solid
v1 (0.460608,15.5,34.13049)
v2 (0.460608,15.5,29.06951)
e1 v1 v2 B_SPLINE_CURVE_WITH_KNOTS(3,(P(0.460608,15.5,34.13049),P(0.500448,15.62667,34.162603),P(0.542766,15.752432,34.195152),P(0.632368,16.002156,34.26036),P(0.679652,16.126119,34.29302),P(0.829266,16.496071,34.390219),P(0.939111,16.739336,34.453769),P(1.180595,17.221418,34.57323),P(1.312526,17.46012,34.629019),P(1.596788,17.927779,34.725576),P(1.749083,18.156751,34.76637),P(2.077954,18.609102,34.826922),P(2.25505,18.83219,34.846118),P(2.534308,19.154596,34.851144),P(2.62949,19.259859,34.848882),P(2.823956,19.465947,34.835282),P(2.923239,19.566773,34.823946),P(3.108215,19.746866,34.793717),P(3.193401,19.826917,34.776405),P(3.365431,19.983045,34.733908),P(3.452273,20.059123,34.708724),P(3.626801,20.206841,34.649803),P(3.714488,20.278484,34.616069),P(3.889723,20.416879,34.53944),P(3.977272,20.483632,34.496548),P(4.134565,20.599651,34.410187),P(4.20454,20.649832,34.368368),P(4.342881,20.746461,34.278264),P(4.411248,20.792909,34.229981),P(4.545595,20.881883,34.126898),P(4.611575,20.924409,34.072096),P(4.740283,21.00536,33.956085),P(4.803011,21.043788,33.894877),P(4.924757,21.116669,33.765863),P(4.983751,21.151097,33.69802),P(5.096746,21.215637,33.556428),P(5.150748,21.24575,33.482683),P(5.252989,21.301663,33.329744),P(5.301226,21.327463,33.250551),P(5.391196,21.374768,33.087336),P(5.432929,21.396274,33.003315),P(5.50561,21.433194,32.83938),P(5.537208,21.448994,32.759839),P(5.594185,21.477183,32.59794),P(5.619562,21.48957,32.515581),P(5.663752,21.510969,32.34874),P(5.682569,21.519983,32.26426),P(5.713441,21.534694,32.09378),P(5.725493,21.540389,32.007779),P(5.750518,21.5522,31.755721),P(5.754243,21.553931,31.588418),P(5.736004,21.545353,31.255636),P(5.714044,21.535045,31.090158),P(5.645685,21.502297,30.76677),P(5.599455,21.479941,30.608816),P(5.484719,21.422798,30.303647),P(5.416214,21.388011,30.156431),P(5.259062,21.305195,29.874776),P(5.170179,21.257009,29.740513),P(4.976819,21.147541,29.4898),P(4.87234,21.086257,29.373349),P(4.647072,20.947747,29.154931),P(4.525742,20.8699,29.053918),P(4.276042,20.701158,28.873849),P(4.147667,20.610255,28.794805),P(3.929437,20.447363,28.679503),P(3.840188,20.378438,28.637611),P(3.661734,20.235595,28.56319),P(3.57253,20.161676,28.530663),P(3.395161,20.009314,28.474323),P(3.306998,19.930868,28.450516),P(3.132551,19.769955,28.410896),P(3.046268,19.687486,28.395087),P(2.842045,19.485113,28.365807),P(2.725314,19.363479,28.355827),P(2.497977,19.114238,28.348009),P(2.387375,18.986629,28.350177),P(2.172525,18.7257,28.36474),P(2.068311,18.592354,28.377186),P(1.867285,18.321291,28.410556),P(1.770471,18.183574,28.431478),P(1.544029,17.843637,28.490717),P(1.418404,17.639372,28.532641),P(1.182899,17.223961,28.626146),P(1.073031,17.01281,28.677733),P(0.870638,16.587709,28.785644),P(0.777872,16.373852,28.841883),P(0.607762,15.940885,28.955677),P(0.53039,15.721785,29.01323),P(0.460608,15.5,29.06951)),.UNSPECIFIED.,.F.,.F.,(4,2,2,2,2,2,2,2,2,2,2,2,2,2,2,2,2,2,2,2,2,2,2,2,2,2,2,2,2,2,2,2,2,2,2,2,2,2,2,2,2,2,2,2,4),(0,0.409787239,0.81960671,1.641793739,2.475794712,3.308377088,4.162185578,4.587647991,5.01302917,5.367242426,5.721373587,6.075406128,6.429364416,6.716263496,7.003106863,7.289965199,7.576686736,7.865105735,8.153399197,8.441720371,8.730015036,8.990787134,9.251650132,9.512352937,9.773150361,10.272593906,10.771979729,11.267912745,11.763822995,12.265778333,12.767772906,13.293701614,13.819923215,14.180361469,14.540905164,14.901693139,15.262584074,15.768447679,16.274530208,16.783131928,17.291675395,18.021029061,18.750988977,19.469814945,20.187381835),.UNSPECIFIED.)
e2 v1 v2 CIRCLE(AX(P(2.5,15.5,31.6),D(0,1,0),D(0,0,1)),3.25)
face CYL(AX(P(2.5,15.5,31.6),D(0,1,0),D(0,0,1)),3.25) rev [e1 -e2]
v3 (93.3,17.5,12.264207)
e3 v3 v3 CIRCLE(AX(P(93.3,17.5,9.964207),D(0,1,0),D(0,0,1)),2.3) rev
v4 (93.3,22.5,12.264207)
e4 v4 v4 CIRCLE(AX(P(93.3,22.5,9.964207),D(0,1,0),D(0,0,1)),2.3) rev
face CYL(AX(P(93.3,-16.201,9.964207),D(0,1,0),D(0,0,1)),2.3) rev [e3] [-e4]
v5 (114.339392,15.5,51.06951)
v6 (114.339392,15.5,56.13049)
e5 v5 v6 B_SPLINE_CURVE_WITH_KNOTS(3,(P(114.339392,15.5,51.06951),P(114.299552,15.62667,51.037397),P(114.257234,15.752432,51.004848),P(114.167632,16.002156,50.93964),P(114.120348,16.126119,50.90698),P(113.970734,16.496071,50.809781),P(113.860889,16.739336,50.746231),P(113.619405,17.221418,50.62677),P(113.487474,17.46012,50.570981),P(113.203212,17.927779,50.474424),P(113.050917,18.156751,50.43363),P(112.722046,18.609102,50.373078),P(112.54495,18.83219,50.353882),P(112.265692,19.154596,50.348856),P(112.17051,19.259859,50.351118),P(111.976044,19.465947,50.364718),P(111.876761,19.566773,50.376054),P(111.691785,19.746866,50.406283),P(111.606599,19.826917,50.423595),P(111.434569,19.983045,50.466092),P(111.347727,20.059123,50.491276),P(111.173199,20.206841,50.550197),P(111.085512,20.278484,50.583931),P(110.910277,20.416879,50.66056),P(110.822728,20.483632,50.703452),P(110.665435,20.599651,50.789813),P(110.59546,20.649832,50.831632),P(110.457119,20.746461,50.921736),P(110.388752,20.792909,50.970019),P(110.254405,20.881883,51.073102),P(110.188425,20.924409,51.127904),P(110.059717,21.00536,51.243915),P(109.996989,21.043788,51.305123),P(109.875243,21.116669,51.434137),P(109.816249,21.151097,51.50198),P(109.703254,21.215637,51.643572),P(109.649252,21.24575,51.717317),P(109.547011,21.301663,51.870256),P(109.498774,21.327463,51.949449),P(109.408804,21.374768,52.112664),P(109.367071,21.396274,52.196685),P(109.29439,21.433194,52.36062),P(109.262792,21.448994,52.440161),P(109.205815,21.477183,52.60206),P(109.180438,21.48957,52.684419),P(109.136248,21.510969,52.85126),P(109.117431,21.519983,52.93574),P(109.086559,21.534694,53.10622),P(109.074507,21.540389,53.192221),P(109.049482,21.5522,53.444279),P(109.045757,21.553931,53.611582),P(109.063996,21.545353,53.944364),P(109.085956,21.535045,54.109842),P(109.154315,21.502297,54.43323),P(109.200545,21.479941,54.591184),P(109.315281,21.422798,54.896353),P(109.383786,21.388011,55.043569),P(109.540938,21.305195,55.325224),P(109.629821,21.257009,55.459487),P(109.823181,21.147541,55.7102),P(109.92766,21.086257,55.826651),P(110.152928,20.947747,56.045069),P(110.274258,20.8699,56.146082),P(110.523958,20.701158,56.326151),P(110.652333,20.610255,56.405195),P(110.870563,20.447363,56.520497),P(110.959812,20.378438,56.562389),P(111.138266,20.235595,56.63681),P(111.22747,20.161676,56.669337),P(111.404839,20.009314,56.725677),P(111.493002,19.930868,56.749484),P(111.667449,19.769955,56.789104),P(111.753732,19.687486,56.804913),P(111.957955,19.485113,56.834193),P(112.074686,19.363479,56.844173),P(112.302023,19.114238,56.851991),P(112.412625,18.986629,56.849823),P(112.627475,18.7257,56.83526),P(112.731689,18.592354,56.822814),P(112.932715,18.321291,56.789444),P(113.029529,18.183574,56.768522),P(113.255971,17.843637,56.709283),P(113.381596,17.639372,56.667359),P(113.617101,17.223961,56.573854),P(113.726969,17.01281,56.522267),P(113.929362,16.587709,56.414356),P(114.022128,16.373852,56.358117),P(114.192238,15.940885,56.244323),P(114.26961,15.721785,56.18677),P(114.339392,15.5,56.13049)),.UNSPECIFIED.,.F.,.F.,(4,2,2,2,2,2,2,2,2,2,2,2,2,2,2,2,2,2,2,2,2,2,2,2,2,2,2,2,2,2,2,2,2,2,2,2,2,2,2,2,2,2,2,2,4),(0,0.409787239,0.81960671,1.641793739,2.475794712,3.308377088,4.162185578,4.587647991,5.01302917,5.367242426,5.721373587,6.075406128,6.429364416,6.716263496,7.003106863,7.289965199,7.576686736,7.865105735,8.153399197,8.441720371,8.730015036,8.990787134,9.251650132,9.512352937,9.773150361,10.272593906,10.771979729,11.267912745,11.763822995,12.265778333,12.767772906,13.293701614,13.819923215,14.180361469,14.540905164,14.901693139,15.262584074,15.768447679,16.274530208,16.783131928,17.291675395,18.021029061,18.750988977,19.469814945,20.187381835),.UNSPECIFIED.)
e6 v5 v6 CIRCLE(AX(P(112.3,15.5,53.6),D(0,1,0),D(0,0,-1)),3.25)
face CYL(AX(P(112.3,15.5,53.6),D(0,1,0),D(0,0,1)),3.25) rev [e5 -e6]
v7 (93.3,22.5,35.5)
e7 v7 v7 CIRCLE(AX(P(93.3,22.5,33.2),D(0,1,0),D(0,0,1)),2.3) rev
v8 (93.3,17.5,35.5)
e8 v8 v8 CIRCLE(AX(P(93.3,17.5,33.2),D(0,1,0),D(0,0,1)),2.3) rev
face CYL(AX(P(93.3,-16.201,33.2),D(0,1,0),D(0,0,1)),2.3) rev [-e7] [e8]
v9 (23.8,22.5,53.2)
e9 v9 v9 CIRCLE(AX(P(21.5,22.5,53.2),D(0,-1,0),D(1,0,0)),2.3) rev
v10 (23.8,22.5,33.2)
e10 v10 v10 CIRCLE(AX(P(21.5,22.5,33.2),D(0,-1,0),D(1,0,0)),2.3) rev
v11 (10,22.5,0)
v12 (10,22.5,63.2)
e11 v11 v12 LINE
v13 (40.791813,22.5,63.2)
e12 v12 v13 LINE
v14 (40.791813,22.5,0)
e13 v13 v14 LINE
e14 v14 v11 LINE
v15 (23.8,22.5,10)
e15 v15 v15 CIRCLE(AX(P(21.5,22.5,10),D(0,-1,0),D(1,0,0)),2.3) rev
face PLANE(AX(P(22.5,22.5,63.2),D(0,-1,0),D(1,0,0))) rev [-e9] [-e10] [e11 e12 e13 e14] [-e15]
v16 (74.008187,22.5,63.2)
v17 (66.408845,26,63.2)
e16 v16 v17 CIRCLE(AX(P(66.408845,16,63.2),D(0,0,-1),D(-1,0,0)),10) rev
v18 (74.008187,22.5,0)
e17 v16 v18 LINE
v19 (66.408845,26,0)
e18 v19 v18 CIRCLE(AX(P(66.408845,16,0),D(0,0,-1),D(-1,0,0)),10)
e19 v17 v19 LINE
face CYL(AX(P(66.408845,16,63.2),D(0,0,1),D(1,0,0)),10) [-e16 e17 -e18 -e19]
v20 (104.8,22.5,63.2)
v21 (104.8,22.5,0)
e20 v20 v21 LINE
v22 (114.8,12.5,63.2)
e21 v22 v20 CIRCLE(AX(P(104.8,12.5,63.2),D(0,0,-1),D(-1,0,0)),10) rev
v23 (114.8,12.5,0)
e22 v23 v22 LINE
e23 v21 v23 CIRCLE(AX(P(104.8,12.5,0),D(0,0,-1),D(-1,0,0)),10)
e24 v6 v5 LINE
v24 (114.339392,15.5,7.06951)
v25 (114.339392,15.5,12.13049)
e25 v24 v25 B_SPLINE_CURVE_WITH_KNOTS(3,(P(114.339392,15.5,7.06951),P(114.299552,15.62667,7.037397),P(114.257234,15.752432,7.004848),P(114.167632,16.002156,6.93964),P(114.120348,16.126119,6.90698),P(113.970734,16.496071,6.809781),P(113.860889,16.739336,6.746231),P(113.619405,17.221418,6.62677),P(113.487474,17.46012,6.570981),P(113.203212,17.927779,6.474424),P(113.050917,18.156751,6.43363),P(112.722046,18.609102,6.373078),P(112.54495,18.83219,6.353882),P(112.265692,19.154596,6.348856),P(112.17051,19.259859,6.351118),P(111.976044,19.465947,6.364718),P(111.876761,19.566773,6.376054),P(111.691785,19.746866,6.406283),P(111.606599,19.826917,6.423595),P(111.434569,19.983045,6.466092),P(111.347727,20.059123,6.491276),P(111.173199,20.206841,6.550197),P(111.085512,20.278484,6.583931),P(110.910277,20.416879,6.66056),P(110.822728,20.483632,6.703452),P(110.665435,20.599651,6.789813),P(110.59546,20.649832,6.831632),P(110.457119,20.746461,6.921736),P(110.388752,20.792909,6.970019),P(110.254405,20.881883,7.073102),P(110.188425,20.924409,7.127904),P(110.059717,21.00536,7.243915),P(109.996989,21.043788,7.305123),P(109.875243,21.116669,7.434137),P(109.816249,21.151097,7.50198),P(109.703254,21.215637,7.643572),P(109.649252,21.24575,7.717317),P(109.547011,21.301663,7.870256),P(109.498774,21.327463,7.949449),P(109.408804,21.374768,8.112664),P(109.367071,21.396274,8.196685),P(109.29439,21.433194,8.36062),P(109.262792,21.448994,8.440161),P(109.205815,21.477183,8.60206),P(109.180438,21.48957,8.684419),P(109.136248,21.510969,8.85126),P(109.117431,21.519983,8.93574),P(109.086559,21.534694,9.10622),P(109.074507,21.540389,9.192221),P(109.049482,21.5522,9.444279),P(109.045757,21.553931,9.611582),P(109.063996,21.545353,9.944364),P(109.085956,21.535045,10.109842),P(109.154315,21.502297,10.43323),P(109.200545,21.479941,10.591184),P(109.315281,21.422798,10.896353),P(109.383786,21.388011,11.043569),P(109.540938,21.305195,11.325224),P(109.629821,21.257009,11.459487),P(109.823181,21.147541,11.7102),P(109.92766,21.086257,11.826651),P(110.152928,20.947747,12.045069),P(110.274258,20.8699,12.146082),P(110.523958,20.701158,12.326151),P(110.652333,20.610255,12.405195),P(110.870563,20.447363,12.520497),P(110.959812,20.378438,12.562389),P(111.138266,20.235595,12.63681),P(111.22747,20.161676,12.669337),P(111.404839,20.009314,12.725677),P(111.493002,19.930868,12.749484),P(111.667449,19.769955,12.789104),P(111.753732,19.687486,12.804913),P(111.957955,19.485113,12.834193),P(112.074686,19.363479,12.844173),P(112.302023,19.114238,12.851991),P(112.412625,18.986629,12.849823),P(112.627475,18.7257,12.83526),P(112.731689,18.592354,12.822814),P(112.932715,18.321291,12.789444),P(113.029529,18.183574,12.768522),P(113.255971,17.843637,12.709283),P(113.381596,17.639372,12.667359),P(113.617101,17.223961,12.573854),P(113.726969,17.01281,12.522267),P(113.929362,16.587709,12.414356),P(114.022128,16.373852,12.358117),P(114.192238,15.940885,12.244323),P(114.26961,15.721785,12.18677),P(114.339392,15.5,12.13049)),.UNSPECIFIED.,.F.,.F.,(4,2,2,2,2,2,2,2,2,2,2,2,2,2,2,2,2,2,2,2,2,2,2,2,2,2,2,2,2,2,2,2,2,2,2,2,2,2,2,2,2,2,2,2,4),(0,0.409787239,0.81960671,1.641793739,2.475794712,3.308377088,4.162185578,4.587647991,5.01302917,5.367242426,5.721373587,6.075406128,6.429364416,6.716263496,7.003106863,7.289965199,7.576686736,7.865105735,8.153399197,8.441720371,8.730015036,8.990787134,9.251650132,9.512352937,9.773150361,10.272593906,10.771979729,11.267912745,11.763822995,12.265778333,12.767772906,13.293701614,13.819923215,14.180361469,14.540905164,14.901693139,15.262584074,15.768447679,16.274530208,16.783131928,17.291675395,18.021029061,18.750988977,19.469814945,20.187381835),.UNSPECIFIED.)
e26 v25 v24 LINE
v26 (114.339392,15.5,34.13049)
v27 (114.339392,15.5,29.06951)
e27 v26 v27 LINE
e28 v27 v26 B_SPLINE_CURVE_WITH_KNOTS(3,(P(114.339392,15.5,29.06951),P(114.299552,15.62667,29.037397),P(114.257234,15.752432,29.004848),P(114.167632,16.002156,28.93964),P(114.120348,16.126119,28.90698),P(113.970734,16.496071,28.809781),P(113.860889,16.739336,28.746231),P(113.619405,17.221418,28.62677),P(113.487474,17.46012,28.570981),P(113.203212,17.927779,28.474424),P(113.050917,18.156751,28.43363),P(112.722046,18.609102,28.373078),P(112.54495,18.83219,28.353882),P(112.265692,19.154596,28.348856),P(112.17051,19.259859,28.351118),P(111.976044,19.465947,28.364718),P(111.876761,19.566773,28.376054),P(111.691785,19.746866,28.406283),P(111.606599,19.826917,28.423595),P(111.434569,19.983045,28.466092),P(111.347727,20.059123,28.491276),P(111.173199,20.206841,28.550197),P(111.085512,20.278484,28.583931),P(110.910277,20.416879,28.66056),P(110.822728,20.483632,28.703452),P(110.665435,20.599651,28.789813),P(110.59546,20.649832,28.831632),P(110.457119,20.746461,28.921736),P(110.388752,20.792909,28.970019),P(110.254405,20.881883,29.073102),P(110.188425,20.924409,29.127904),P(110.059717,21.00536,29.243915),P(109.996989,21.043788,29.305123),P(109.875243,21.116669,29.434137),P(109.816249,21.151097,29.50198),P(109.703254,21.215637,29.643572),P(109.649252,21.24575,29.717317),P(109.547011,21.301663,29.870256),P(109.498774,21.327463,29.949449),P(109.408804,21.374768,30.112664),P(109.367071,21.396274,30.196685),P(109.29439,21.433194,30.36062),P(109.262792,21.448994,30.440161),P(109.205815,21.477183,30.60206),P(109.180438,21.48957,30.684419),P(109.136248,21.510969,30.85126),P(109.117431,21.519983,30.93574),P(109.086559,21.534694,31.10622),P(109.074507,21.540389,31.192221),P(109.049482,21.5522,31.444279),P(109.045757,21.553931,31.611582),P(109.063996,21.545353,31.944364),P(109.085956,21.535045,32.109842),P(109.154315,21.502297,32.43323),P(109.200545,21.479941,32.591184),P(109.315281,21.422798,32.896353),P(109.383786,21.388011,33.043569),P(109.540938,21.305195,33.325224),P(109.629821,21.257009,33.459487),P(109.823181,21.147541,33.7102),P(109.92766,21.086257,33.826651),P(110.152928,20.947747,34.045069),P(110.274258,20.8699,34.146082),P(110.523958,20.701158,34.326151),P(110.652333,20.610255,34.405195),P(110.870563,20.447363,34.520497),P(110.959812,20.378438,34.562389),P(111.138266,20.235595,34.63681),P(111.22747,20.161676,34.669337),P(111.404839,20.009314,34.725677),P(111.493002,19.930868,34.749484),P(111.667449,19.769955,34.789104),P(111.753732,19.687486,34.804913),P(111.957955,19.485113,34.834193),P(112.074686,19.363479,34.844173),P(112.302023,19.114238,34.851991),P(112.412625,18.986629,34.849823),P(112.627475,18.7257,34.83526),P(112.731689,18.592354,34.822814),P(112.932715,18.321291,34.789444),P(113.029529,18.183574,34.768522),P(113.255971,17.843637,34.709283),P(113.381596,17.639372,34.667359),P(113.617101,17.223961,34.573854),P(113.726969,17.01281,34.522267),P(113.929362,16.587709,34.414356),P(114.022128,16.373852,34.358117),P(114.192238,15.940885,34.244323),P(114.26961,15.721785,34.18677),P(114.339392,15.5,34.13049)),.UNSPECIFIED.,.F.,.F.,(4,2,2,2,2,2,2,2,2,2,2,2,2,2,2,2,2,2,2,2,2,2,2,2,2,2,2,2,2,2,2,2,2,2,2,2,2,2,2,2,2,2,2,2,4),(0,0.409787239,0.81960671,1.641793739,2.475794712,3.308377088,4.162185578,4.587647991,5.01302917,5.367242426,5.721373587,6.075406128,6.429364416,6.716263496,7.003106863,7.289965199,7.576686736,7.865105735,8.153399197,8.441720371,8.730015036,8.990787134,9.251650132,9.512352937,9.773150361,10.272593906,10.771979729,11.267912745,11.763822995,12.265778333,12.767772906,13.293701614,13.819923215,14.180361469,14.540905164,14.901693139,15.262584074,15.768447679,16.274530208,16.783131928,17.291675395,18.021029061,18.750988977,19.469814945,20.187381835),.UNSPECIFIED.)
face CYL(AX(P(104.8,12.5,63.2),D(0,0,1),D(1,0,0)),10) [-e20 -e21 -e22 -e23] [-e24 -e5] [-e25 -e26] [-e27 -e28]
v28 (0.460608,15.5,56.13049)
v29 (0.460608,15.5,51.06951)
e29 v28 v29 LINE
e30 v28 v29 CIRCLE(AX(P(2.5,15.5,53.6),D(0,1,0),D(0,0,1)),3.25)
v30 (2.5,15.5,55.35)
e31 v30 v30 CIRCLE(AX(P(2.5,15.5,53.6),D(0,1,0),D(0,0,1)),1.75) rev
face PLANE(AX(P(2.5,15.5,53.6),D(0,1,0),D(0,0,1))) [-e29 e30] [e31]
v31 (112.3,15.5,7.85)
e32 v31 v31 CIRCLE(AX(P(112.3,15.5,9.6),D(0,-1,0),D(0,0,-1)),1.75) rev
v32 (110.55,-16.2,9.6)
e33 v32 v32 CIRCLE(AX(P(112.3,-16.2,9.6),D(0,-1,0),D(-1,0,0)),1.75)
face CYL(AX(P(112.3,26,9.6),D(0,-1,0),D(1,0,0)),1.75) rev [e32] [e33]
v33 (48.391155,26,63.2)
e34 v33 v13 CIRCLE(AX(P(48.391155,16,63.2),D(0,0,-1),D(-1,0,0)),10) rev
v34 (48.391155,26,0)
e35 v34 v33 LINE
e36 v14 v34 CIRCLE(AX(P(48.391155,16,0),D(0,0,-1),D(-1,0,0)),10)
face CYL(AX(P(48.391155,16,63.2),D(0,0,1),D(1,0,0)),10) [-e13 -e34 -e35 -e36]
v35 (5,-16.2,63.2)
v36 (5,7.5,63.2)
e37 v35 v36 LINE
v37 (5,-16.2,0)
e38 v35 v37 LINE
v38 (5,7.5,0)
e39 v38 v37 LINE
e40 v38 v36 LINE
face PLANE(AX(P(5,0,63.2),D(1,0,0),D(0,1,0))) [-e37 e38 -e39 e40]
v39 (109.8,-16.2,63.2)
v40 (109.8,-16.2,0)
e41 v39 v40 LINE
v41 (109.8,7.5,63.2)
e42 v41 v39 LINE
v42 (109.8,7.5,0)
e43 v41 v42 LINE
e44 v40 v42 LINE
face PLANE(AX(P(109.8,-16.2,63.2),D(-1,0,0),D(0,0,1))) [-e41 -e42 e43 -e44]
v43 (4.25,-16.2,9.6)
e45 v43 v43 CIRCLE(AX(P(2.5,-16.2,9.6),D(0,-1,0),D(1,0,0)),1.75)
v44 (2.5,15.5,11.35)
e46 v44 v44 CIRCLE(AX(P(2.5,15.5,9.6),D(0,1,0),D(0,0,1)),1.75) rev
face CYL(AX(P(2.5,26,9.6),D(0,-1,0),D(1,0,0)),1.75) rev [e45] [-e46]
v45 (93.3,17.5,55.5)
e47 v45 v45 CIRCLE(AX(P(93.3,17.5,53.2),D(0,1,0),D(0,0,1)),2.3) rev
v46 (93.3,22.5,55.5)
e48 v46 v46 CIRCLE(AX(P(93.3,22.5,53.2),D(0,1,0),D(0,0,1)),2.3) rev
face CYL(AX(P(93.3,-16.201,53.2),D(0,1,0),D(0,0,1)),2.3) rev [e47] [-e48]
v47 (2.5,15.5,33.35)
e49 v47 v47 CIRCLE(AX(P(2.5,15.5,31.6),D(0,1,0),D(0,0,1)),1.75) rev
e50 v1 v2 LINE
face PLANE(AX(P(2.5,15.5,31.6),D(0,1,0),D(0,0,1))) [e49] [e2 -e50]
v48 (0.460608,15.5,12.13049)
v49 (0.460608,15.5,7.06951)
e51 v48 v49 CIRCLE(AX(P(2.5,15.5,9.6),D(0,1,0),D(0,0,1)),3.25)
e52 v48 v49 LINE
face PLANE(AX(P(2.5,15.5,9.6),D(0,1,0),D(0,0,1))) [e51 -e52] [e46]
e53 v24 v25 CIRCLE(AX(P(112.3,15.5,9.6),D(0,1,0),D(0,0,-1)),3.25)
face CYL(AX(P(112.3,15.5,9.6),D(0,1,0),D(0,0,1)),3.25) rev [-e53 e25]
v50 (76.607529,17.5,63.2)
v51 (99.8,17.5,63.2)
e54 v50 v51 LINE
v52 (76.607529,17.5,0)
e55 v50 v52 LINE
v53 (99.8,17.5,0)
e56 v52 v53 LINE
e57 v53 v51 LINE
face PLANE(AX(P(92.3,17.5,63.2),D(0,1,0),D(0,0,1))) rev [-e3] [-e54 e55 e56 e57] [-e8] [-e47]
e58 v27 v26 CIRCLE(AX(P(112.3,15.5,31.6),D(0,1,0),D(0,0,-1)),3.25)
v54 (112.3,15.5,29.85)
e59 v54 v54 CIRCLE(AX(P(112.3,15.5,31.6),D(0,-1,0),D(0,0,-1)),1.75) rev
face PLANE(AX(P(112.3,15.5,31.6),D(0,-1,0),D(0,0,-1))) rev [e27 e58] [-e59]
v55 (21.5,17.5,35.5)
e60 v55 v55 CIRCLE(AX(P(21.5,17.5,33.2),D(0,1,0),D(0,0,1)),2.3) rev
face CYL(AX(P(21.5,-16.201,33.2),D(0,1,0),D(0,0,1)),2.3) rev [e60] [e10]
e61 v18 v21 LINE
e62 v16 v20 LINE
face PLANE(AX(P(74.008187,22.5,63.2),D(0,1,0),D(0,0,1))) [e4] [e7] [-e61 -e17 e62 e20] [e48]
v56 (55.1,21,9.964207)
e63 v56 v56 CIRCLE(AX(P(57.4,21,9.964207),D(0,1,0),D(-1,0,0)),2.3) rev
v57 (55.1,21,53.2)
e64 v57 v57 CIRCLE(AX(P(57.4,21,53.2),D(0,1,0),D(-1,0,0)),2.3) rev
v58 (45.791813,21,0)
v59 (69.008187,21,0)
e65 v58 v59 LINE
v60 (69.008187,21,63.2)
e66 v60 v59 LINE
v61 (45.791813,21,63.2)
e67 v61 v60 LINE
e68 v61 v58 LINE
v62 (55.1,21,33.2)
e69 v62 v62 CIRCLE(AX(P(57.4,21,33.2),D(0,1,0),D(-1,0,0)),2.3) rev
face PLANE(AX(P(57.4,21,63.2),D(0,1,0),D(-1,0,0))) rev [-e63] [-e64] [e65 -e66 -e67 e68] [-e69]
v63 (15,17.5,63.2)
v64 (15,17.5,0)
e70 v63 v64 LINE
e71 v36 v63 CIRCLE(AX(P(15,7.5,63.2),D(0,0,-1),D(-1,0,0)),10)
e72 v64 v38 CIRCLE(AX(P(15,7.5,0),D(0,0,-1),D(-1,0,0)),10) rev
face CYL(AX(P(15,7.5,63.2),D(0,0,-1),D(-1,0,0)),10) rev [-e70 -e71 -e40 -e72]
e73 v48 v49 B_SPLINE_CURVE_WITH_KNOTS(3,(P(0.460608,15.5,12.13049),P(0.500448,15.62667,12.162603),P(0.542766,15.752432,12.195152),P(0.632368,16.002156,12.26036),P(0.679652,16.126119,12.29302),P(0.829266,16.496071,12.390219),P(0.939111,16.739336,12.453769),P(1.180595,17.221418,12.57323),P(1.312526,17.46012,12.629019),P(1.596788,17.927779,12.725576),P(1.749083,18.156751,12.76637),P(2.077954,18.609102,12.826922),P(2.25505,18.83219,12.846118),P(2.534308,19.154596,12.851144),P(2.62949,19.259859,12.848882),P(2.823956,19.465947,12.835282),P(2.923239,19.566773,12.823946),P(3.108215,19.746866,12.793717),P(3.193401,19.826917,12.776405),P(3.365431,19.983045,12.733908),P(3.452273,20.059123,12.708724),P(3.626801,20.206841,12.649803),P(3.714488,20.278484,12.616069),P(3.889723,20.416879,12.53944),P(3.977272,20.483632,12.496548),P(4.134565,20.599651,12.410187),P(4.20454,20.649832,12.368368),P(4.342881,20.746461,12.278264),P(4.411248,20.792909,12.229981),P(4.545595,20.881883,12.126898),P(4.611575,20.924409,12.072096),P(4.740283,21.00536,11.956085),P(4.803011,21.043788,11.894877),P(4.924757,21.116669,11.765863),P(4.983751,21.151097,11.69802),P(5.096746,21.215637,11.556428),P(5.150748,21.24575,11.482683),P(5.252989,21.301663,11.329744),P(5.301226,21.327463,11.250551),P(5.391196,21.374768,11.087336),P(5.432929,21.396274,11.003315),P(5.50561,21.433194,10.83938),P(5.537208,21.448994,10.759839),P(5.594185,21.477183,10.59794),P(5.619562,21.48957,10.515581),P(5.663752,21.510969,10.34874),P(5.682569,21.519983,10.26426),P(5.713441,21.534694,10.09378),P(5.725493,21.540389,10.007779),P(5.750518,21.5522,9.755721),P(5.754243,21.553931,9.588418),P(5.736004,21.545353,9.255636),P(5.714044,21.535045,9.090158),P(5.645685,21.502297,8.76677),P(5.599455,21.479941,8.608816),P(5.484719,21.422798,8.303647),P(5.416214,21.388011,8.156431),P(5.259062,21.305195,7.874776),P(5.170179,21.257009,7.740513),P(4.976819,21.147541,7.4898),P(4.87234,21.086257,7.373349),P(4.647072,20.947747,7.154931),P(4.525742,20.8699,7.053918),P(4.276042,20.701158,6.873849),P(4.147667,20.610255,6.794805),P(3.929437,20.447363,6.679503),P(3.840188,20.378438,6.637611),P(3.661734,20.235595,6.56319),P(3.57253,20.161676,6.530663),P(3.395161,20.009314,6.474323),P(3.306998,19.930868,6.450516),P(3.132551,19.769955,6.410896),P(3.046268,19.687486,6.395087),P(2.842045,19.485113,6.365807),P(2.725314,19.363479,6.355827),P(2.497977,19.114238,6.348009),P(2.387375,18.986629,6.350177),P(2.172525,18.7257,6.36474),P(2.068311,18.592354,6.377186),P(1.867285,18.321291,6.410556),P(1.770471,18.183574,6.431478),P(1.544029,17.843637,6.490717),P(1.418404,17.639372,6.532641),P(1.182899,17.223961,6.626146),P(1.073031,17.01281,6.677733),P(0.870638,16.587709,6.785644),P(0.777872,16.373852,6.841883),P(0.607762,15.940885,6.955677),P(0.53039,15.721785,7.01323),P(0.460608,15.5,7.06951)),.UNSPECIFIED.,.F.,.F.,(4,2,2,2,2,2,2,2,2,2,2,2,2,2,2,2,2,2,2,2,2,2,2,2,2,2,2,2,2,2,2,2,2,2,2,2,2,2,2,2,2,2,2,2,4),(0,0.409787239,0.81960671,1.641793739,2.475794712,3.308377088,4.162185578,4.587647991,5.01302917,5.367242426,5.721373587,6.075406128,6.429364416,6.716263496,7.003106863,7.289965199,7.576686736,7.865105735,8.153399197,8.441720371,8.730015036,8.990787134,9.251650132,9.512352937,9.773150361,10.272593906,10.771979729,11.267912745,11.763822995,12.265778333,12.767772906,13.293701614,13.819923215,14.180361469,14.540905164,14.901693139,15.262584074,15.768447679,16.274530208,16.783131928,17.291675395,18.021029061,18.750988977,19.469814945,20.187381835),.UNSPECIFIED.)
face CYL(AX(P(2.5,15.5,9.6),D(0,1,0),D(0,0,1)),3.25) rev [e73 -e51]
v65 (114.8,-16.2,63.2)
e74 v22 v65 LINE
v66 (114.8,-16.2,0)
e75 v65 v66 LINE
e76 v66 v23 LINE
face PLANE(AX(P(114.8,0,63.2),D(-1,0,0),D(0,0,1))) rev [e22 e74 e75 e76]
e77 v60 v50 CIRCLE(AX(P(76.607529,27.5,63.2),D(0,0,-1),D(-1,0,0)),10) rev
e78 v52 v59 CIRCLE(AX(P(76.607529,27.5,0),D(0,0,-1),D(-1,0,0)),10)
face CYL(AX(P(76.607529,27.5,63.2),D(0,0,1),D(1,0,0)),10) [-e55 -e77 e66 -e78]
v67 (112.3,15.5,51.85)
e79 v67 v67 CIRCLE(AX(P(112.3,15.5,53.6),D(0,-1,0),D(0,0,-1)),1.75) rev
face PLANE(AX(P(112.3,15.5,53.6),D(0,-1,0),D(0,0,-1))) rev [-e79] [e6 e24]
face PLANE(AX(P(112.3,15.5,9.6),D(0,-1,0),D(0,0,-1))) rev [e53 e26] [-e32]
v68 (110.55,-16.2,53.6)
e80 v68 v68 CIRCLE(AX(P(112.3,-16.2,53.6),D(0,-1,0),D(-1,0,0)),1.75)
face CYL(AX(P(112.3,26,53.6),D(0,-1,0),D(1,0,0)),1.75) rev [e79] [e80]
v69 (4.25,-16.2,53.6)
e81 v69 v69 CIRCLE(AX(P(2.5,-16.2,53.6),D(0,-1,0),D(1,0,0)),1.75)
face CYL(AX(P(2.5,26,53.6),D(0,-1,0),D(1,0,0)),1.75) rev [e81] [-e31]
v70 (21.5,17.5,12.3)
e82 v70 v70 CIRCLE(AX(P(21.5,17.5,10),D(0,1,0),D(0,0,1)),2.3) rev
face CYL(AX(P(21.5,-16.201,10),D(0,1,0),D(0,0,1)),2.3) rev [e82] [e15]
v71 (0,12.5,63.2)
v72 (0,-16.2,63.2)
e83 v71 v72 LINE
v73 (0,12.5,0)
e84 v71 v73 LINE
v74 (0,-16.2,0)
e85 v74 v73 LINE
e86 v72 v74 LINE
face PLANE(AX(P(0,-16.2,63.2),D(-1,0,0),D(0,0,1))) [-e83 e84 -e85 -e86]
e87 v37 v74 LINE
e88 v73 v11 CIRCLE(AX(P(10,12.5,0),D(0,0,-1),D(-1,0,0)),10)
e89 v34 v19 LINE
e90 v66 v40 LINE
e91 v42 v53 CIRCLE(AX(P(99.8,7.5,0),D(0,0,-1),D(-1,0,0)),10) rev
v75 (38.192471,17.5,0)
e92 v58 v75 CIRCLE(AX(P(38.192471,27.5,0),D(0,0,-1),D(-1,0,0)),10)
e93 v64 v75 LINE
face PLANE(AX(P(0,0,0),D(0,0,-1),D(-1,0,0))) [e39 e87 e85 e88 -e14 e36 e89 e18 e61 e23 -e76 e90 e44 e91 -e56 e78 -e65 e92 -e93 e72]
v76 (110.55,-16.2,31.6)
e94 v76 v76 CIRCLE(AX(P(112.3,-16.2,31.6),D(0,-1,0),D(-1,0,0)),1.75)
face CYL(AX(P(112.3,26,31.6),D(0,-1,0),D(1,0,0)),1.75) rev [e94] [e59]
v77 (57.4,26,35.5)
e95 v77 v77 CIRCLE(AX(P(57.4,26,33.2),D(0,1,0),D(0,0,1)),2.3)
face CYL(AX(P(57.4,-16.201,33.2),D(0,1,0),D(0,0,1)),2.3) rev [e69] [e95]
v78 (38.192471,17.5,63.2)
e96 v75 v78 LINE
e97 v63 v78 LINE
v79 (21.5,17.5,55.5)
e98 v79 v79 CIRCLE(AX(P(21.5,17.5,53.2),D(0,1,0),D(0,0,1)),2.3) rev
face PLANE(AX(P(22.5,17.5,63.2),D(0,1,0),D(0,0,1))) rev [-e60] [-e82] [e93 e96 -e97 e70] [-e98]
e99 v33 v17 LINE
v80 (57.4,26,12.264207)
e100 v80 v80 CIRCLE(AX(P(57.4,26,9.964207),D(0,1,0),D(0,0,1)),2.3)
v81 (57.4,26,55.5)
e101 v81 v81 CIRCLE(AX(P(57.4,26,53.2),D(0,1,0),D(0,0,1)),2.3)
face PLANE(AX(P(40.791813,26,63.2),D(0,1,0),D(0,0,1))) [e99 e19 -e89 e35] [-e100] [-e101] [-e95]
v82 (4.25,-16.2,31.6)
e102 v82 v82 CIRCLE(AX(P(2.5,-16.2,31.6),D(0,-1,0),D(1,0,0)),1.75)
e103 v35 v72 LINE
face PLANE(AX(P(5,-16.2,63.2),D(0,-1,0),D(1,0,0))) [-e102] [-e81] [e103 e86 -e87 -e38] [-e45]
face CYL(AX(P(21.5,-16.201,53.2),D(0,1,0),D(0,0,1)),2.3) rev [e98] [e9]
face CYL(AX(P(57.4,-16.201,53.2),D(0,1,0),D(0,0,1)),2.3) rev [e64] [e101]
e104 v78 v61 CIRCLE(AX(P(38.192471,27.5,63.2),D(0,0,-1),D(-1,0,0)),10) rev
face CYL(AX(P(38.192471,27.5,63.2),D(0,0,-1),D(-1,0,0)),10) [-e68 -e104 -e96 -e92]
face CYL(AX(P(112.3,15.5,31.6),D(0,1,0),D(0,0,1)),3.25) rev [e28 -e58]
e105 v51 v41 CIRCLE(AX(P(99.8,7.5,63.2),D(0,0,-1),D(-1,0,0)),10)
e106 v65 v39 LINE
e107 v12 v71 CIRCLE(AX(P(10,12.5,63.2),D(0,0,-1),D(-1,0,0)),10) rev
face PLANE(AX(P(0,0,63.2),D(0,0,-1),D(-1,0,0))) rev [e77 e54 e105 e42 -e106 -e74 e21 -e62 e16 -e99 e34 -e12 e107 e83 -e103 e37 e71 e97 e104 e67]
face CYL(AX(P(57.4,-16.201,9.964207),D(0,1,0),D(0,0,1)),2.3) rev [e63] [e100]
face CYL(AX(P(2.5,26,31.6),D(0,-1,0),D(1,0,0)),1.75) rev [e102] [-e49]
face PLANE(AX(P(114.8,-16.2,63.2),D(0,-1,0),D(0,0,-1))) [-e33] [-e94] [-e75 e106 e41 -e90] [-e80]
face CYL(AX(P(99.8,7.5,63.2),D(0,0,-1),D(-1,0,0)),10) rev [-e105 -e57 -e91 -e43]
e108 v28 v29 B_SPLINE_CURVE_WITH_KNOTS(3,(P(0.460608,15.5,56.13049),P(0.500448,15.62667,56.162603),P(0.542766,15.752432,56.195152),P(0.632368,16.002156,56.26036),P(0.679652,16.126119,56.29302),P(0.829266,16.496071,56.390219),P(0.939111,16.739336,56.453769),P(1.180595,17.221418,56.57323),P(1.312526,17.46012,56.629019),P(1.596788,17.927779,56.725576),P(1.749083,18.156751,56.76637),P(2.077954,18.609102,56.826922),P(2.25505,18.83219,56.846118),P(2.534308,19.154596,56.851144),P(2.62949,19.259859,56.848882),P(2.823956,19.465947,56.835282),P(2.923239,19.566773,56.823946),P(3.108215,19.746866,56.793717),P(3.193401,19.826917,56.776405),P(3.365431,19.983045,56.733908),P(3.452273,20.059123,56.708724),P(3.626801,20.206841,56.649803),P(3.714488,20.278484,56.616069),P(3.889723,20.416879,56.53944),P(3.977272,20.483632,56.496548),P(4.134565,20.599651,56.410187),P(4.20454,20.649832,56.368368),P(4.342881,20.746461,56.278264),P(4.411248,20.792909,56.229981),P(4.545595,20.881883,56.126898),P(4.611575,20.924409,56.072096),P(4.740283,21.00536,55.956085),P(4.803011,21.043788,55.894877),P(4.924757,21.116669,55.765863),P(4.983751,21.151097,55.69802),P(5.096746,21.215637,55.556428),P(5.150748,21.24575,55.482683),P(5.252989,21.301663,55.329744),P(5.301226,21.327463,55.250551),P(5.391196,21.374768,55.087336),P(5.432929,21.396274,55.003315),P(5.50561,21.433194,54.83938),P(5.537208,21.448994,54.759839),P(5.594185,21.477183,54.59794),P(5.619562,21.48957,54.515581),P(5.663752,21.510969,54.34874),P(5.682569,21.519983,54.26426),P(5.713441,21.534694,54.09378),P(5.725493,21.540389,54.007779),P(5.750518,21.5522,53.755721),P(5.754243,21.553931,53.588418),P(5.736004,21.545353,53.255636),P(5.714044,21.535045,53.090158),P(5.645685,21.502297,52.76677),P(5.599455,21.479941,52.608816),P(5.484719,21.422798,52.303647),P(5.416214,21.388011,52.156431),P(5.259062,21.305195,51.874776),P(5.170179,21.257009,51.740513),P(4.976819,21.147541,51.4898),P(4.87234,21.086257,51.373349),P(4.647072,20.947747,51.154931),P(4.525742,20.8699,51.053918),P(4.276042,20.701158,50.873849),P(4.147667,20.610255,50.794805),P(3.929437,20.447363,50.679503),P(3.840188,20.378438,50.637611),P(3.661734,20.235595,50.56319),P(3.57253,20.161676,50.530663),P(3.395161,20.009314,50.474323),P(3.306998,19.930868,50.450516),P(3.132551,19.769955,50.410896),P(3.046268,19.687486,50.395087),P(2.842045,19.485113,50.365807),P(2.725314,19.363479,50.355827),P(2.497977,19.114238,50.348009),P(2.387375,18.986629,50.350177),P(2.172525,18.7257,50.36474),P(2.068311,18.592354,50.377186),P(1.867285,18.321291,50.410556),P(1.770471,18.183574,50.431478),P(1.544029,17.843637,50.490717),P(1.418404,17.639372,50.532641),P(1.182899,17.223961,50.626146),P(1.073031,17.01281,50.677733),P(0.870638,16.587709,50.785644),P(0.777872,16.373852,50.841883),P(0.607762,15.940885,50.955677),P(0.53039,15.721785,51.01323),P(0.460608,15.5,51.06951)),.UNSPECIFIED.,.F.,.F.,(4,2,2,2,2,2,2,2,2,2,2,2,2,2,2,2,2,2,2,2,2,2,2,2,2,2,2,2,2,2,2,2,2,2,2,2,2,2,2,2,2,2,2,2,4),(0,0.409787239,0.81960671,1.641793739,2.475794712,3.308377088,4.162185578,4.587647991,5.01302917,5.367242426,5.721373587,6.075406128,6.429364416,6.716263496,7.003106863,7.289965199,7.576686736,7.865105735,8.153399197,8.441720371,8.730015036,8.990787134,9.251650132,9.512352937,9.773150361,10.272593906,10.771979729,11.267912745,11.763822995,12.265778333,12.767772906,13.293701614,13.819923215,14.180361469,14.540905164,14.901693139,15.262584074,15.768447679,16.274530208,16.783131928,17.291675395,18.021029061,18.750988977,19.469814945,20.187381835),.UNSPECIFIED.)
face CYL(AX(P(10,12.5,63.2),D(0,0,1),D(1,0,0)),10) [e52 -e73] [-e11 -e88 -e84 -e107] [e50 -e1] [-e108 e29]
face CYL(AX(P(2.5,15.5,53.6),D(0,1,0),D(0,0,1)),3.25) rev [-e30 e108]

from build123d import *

# Parameters (mm, degrees)
BOSS_EXTRUDE1_DEPTH = 63.2
FILLET1_R           = 10
FILLET2_R           = 10
FILLET3_R           = 10
CUT_EXTRUDE1_REACH  = 139.674
SKETCH2_R           = 2.3
SKETCH3_R           = 1.75
CUT_EXTRUDE2_DEPTH  = 138.67396268
SKETCH4_R           = 3.25
CUT_EXTRUDE3_DEPTH  = 7


with BuildPart() as part:
    # Sketch1 → Boss-Extrude1 (new body)
    with BuildSketch(Plane.XY):
        Polygon((114.8, 0), (114.8, 22.5), (92.3, 22.5), (74.008186766, 22.5), (74.008186766, 26), (40.791813234, 26), (40.791813234, 22.5), (22.5, 22.5), (0, 22.5), (0, 0), (0, -16.2), (5, -16.2), (5, 0), (5, 17.5), (22.5, 17.5), (45.791813234, 17.5), (45.791813234, 21), (57.4, 21), (69.008186766, 21), (69.008186766, 17.5), (92.3, 17.5), (109.8, 17.5), (109.8, 0), (109.8, -16.2), (114.8, -16.2), align=None)
    extrude(amount=BOSS_EXTRUDE1_DEPTH)

    # Fillet1
    fillet1_edges = [part.edges().sort_by_distance(p)[0] for p in [
        (0, 22.5, 31.6),
        (114.8, 22.5, 31.6),
        (109.8, 17.5, 31.6),
        (5, 17.5, 31.6),
    ]]
    fillet(fillet1_edges, radius=FILLET1_R)

    # Fillet2
    # the kernel refuses this fillet: 10 mm, written as the material it takes off along each edge
    with BuildSketch(Plane(origin=(40.791813234, 26, -18.998355192), x_dir=(1, 0, 0), z_dir=(0, 0, 1))) as fillet2_piece_1:
        with BuildLine():
            CenterArc((7.599342077, -10), FILLET2_R, 90, 49.458398126)
            Line((0, -3.5), (-0.151986842, -3.37))
            ThreePointArc((-0.151986842, -3.37), (-0.2, -1.75), (-0.2, 0))
            Line((-0.2, 0), (0, 0.2))
            Line((0, 0.2), (7.599342077, 0.2))
            Line((7.599342077, 0.2), (7.599342077, 0))
        make_face()
    extrude(amount=101.196710384, mode=Mode.SUBTRACT)
    with BuildSketch(Plane(origin=(74.008186766, 26, -18.998355192), x_dir=(0, -1, 0), z_dir=(0, 0, 1))) as fillet2_piece_2:
        with BuildLine():
            CenterArc((10, -7.599342077), FILLET2_R, 130.541601874, 49.458398126)
            Line((0, -7.599342077), (-0.2, -7.599342077))
            Line((-0.2, -7.599342077), (-0.2, 0))
            Line((-0.2, 0), (0, 0.2))
            ThreePointArc((0, 0.2), (1.75, 0.2), (3.37, 0.151986842))
            Line((3.37, 0.151986842), (3.5, 0))
        make_face()
    extrude(amount=101.196710384, mode=Mode.SUBTRACT)

    # Fillet3
    # the kernel refuses this fillet: 10 mm, written as the material it takes off along each edge
    with BuildSketch(Plane(origin=(45.791813234, 17.5, -18.998355192), x_dir=(0, 1, 0), z_dir=(0, 0, 1))) as fillet3_piece_1:
        with BuildLine():
            CenterArc((10, 7.599342077), FILLET3_R, 180, 49.458398126)
            Line((0, 7.599342077), (-0.2, 7.599342077))
            Line((-0.2, 7.599342077), (-0.2, 0))
            Line((-0.2, 0), (0, -0.2))
            ThreePointArc((0, -0.2), (1.75, -0.2), (3.37, -0.151986842))
            Line((3.37, -0.151986842), (3.5, 0))
        make_face()
    extrude(amount=101.196710384, mode=Mode.SUBTRACT)
    with BuildSketch(Plane(origin=(69.008186766, 17.5, -18.998355192), x_dir=(1, 0, 0), z_dir=(0, 0, 1))) as fillet3_piece_2:
        with BuildLine():
            CenterArc((7.599342077, 10), FILLET3_R, 220.541601874, 49.458398126)
            Line((0, 3.5), (-0.151986842, 3.37))
            ThreePointArc((-0.151986842, 3.37), (-0.2, 1.75), (-0.2, 0))
            Line((-0.2, 0), (0, -0.2))
            Line((0, -0.2), (7.599342077, -0.2))
            Line((7.599342077, -0.2), (7.599342077, 0))
        make_face()
    extrude(amount=101.196710384, mode=Mode.SUBTRACT)

    # Sketch2 → Cut-Extrude1 (cut, up to next)
    with BuildSketch(Plane(origin=(0, 26, 0), x_dir=(1, 0, 0), z_dir=(0, 1, 0)), mode=Mode.PRIVATE) as cut_extrude1_sk1:
        with Locations(Location((57.4, -9.964206912, 0), (0, 0, 270))):
            Circle(SKETCH2_R)
    cut_extrude1_tool1 = extrude(cut_extrude1_sk1.sketch, amount=-CUT_EXTRUDE1_REACH, mode=Mode.PRIVATE) & part.part
    # Sketch2 → Cut-Extrude1 (cut, up to next)
    with BuildSketch(Plane(origin=(0, 26, 0), x_dir=(1, 0, 0), z_dir=(0, 1, 0)), mode=Mode.PRIVATE) as cut_extrude1_sk2:
        with Locations(Location((57.4, -33.2, 0), (0, 0, 270))):
            Circle(SKETCH2_R)
    cut_extrude1_tool2 = extrude(cut_extrude1_sk2.sketch, amount=-CUT_EXTRUDE1_REACH, mode=Mode.PRIVATE) & part.part
    # Sketch2 → Cut-Extrude1 (cut, up to next)
    with BuildSketch(Plane(origin=(0, 26, 0), x_dir=(1, 0, 0), z_dir=(0, 1, 0)), mode=Mode.PRIVATE) as cut_extrude1_sk3:
        with Locations(Location((57.4, -53.2, 0), (0, 0, 270))):
            Circle(SKETCH2_R)
    cut_extrude1_tool3 = extrude(cut_extrude1_sk3.sketch, amount=-CUT_EXTRUDE1_REACH, mode=Mode.PRIVATE) & part.part
    # Sketch2 → Cut-Extrude1 (cut, up to next)
    with BuildSketch(Plane(origin=(0, 26, 0), x_dir=(1, 0, 0), z_dir=(0, 1, 0)), mode=Mode.PRIVATE) as cut_extrude1_sk4:
        with Locations(Location((21.5, -10, 0), (0, 0, 270))):
            Circle(SKETCH2_R)
    cut_extrude1_tool4 = extrude(cut_extrude1_sk4.sketch, amount=-CUT_EXTRUDE1_REACH, mode=Mode.PRIVATE) & part.part
    # Sketch2 → Cut-Extrude1 (cut, up to next)
    with BuildSketch(Plane(origin=(0, 26, 0), x_dir=(1, 0, 0), z_dir=(0, 1, 0)), mode=Mode.PRIVATE) as cut_extrude1_sk5:
        with Locations(Location((93.3, -9.964206912, 0), (0, 0, 270))):
            Circle(SKETCH2_R)
    cut_extrude1_tool5 = extrude(cut_extrude1_sk5.sketch, amount=-CUT_EXTRUDE1_REACH, mode=Mode.PRIVATE) & part.part
    # Sketch2 → Cut-Extrude1 (cut, up to next)
    with BuildSketch(Plane(origin=(0, 26, 0), x_dir=(1, 0, 0), z_dir=(0, 1, 0)), mode=Mode.PRIVATE) as cut_extrude1_sk6:
        with Locations(Location((93.3, -33.2, 0), (0, 0, 270))):
            Circle(SKETCH2_R)
    cut_extrude1_tool6 = extrude(cut_extrude1_sk6.sketch, amount=-CUT_EXTRUDE1_REACH, mode=Mode.PRIVATE) & part.part
    # Sketch2 → Cut-Extrude1 (cut, up to next)
    with BuildSketch(Plane(origin=(0, 26, 0), x_dir=(1, 0, 0), z_dir=(0, 1, 0)), mode=Mode.PRIVATE) as cut_extrude1_sk7:
        with Locations(Location((93.3, -53.2, 0), (0, 0, 270))):
            Circle(SKETCH2_R)
    cut_extrude1_tool7 = extrude(cut_extrude1_sk7.sketch, amount=-CUT_EXTRUDE1_REACH, mode=Mode.PRIVATE) & part.part
    # Sketch2 → Cut-Extrude1 (cut, up to next)
    with BuildSketch(Plane(origin=(0, 26, 0), x_dir=(1, 0, 0), z_dir=(0, 1, 0)), mode=Mode.PRIVATE) as cut_extrude1_sk8:
        with Locations(Location((21.5, -53.2, 0), (0, 0, 270))):
            Circle(SKETCH2_R)
    cut_extrude1_tool8 = extrude(cut_extrude1_sk8.sketch, amount=-CUT_EXTRUDE1_REACH, mode=Mode.PRIVATE) & part.part
    # Sketch2 → Cut-Extrude1 (cut, up to next)
    with BuildSketch(Plane(origin=(0, 26, 0), x_dir=(1, 0, 0), z_dir=(0, 1, 0)), mode=Mode.PRIVATE) as cut_extrude1_sk9:
        with Locations(Location((21.5, -33.2, 0), (0, 0, 270))):
            Circle(SKETCH2_R)
    cut_extrude1_tool9 = extrude(cut_extrude1_sk9.sketch, amount=-CUT_EXTRUDE1_REACH, mode=Mode.PRIVATE) & part.part
    add(cut_extrude1_tool1.solids().sort_by_distance((57.4, 26, 9.964207))[0], mode=Mode.SUBTRACT)
    add(cut_extrude1_tool2.solids().sort_by_distance((57.4, 26, 33.2))[0], mode=Mode.SUBTRACT)
    add(cut_extrude1_tool3.solids().sort_by_distance((57.4, 26, 53.2))[0], mode=Mode.SUBTRACT)
    add(cut_extrude1_tool4.solids().sort_by_distance((21.5, 26, 10))[0], mode=Mode.SUBTRACT)
    add(cut_extrude1_tool5.solids().sort_by_distance((93.3, 26, 9.964207))[0], mode=Mode.SUBTRACT)
    add(cut_extrude1_tool6.solids().sort_by_distance((93.3, 26, 33.2))[0], mode=Mode.SUBTRACT)
    add(cut_extrude1_tool7.solids().sort_by_distance((93.3, 26, 53.2))[0], mode=Mode.SUBTRACT)
    add(cut_extrude1_tool8.solids().sort_by_distance((21.5, 26, 53.2))[0], mode=Mode.SUBTRACT)
    add(cut_extrude1_tool9.solids().sort_by_distance((21.5, 26, 33.2))[0], mode=Mode.SUBTRACT)

    # Sketch3 → Cut-Extrude2 (cut, through all)
    with BuildSketch(Plane.XZ.offset(16.2)):
        with Locations((2.5, 31.6)):
            Circle(SKETCH3_R)
        with Locations((2.5, 53.6)):
            Circle(SKETCH3_R)
        with Locations((2.5, 9.6)):
            Circle(SKETCH3_R)
        with Locations((112.3, 9.6)):
            Circle(SKETCH3_R)
        with Locations((112.3, 53.6)):
            Circle(SKETCH3_R)
        with Locations((112.3, 31.6)):
            Circle(SKETCH3_R)
    extrude(amount=-CUT_EXTRUDE2_DEPTH, mode=Mode.SUBTRACT)

    # Sketch4 → Cut-Extrude3 (cut)
    with BuildSketch(Plane(origin=(0, 22.5, 0), x_dir=(1, 0, 0), z_dir=(0, 1, 0))):
        with Locations((2.5, -9.6)):
            Circle(SKETCH4_R)
        with Locations((2.5, -31.6)):
            Circle(SKETCH4_R)
        with Locations((2.5, -53.6)):
            Circle(SKETCH4_R)
        with Locations((112.3, -53.6)):
            Circle(SKETCH4_R)
        with Locations((112.3, -31.6)):
            Circle(SKETCH4_R)
        with Locations((112.3, -9.6)):
            Circle(SKETCH4_R)
    extrude(amount=-CUT_EXTRUDE3_DEPTH, mode=Mode.SUBTRACT)


solid = part.part
